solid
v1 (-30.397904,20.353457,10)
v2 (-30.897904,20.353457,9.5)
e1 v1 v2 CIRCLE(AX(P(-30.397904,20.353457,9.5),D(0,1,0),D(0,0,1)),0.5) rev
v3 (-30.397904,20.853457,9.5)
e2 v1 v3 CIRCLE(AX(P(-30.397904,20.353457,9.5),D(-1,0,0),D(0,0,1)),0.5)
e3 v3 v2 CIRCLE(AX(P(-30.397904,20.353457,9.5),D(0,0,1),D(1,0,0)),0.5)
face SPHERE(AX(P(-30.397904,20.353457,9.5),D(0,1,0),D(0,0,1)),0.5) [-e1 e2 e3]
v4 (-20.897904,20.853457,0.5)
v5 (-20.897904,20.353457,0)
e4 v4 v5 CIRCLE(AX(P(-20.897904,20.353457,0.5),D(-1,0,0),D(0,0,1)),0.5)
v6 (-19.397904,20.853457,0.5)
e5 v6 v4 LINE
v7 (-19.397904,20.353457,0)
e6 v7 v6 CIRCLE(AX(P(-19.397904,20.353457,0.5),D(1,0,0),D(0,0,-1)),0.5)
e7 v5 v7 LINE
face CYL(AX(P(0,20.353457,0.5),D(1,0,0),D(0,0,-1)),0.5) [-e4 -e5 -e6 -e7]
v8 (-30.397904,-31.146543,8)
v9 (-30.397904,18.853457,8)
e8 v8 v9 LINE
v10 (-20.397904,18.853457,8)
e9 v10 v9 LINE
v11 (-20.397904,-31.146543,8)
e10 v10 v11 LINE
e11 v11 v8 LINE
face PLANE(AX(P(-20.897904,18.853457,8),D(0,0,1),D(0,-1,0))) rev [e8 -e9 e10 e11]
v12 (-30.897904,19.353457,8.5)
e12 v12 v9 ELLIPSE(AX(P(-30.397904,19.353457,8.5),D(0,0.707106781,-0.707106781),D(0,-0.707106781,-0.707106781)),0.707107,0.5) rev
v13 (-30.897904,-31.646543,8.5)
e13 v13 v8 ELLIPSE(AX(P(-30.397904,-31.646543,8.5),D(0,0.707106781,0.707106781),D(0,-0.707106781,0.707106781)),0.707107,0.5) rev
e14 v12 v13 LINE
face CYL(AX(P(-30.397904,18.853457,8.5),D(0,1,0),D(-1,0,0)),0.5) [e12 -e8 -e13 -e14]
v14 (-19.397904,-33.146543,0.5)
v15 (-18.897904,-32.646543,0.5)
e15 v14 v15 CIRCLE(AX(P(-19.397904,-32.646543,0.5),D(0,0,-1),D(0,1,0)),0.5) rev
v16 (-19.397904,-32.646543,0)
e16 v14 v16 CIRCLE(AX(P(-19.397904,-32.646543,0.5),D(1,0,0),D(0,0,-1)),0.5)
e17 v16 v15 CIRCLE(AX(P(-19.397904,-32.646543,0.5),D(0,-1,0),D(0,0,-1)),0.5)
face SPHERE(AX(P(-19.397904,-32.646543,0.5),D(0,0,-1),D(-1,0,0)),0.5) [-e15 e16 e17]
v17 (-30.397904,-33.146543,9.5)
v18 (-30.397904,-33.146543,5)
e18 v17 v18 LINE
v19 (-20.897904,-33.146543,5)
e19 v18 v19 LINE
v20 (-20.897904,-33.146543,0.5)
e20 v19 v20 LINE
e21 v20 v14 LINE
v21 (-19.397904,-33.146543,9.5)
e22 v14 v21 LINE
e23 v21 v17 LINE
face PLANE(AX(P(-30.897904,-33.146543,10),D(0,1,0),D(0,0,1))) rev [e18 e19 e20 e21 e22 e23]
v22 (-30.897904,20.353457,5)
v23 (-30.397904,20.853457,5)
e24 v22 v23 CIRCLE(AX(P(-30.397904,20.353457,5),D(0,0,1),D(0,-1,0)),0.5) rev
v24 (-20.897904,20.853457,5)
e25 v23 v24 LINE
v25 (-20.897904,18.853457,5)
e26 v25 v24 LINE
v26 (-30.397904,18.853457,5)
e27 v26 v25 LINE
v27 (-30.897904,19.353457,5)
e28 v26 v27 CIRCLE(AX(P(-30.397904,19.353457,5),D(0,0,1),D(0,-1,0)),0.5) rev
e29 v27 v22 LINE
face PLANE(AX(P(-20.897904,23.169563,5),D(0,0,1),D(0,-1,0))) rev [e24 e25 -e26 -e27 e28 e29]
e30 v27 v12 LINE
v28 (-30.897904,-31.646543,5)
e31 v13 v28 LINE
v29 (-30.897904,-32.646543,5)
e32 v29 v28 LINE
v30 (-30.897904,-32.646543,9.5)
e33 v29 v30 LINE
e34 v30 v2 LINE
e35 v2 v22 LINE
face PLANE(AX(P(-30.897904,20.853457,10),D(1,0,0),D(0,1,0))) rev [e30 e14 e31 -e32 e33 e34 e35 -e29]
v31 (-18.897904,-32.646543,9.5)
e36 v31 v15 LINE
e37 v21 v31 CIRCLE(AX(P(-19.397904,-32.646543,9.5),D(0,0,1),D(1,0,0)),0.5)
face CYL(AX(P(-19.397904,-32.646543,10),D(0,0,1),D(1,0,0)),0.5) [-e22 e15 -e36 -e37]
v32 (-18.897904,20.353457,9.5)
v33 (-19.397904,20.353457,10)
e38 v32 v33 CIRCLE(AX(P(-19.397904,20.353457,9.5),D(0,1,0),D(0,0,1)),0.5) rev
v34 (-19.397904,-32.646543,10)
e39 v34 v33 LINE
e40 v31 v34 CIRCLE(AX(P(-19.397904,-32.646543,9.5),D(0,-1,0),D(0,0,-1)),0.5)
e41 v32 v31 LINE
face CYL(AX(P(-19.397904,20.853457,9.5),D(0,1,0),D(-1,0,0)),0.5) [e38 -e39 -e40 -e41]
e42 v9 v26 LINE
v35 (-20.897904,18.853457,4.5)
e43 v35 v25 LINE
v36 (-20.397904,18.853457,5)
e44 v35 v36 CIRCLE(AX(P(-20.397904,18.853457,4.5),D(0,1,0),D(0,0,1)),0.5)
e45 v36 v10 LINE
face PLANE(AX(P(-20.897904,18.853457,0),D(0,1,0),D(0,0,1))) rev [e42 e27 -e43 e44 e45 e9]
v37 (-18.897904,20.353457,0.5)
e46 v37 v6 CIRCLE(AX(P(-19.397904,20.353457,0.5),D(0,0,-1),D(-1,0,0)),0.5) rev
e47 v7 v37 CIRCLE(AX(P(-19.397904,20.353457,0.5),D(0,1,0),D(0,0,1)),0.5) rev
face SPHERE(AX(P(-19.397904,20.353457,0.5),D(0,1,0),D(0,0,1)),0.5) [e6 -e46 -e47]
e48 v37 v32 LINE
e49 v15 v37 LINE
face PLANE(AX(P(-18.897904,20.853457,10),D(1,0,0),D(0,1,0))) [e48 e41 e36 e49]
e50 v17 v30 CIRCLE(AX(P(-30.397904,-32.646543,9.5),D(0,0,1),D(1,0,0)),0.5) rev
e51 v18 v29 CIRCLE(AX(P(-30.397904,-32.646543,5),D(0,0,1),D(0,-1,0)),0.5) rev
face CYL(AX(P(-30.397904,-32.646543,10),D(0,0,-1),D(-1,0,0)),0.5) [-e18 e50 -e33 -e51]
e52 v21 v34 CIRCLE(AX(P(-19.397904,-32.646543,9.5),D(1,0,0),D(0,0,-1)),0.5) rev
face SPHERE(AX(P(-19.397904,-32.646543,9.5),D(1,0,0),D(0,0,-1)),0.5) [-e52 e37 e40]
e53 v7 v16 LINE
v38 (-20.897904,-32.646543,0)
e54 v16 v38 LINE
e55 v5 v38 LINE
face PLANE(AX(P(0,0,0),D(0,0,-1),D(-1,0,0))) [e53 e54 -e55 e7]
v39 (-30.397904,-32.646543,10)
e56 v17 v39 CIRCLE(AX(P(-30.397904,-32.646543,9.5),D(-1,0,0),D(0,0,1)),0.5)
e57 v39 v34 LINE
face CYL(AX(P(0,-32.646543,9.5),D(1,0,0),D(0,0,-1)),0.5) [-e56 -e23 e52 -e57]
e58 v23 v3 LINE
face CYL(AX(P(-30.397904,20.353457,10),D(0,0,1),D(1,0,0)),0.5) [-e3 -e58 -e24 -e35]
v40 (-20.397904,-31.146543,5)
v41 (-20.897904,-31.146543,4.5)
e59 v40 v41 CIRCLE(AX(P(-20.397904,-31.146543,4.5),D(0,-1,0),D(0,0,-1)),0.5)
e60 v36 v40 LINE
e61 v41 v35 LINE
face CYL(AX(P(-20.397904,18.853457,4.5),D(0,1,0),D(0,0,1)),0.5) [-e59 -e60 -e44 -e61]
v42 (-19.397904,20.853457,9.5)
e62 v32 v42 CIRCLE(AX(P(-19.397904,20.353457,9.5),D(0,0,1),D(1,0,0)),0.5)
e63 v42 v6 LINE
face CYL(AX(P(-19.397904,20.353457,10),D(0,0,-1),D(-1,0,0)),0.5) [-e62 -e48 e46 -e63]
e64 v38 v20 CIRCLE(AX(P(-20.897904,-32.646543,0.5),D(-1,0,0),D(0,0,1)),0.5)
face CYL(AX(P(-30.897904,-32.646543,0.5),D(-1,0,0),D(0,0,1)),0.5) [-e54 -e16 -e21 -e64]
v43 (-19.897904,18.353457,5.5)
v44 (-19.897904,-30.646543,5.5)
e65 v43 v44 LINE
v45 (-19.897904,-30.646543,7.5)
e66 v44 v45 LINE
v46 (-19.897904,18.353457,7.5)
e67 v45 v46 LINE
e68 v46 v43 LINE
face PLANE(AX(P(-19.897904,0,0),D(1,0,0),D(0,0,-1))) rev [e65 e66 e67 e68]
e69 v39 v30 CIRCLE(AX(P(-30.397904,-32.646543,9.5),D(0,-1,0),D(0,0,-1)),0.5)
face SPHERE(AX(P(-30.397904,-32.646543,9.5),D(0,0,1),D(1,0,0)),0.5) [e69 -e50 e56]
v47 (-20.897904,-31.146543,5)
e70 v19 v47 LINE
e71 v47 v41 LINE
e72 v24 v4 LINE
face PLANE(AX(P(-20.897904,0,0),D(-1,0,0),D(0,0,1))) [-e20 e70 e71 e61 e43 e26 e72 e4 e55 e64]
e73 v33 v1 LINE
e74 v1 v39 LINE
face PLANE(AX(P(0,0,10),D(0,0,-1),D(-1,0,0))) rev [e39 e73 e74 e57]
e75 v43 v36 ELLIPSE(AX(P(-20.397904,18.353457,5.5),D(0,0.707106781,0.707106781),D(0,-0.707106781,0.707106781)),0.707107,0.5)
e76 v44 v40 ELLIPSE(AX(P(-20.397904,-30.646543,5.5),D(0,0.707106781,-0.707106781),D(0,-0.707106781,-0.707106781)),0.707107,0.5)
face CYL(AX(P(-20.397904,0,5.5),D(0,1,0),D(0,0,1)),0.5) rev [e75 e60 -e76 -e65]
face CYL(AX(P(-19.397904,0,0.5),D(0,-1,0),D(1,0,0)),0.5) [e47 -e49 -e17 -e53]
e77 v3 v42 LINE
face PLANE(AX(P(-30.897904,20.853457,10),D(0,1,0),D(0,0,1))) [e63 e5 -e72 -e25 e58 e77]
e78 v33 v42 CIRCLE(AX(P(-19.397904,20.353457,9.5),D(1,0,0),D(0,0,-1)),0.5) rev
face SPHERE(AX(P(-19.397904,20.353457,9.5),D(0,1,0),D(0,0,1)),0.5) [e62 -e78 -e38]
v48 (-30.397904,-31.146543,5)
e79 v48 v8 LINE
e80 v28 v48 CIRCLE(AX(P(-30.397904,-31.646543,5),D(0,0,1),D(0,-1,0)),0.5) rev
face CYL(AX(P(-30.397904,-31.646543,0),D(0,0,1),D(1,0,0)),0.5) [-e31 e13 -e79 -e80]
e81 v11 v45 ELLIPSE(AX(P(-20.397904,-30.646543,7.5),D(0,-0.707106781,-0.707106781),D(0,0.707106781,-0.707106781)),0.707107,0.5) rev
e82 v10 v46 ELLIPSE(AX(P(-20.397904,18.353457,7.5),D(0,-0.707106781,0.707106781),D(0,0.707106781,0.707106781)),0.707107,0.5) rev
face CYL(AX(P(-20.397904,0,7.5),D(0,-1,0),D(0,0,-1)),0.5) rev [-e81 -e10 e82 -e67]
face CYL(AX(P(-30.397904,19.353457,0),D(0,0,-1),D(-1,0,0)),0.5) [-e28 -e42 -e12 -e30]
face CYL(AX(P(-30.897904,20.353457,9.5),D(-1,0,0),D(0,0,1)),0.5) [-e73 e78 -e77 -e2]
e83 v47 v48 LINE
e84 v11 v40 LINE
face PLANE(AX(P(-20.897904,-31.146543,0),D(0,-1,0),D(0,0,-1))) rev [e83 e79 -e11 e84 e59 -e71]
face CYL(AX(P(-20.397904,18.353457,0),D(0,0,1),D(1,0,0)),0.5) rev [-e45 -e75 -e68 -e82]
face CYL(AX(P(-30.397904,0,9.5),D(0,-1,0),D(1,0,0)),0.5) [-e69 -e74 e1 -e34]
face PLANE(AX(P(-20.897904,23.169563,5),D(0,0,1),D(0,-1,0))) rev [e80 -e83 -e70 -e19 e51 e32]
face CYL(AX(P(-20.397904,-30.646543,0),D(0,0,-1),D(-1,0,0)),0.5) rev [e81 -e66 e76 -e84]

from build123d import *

# Parameters (mm, degrees)
SKETCH_1_W          = 12
SKETCH_1_H          = 54
EXTRUDE_1_DEPTH     = 10
SKETCH_2_W          = 8
SKETCH_2_H          = 50
CUT_EXTRUDE_1_DEPTH = 10
SKETCH_3_W          = 13.565938191
SKETCH_3_H          = 57.788760324
CUT_EXTRUDE_2_DEPTH = 10
SKETCH_4_W          = 3
SKETCH_4_H          = 50
CUT_EXTRUDE_3_DEPTH = 1
FILLET_1_R          = 0.5


with BuildPart() as part:
    # 草圖1 → 填料-伸長1 (new body)
    with BuildSketch(Plane.XY):
        with Locations((-24.897904343, -6.146542517)):
            Rectangle(SKETCH_1_W, SKETCH_1_H)
    extrude(amount=EXTRUDE_1_DEPTH)

    # 草圖2 → 除料-伸長1 (cut)
    with BuildSketch(Plane.ZY.offset(30.897904343)):
        with Locations((4, -6.146542517)):
            Rectangle(SKETCH_2_W, SKETCH_2_H)
    extrude(amount=-CUT_EXTRUDE_1_DEPTH, mode=Mode.SUBTRACT)

    # 草圖3 → 除料-伸長2 (cut)
    with BuildSketch(Plane.ZY.offset(30.897904343)):
        with Locations((-1.782969096, -5.724817648)):
            Rectangle(SKETCH_3_W, SKETCH_3_H)
    extrude(amount=-CUT_EXTRUDE_2_DEPTH, mode=Mode.SUBTRACT)

    # 草圖4 → 除料-伸長3 (cut)
    with BuildSketch(Plane.ZY.offset(20.897904343)):
        with Locations((6.5, -6.146542517)):
            Rectangle(SKETCH_4_W, SKETCH_4_H)
    extrude(amount=-CUT_EXTRUDE_3_DEPTH, mode=Mode.SUBTRACT)

    # 圓角1
    fillet_1_edges = [part.edges().sort_by_distance(p)[0] for p in [
        (-24.897904343, 20.853457483, 10),
        (-30.897904343, -6.146542517, 10),
        (-30.897904343, -6.146542517, 8),
        (-30.897904343, 18.853457483, 6.5),
        (-30.897904343, -31.146542517, 6.5),
        (-19.897904343, 20.853457483, 0),
        (-19.897904343, -33.146542517, 0),
        (-24.897904343, -33.146542517, 10),
        (-18.897904343, -6.146542517, 0),
        (-19.897904343, -6.146542517, 8),
        (-19.897904343, -31.146542517, 6.5),
        (-19.897904343, -6.146542517, 5),
        (-19.897904343, 18.853457483, 6.5),
        (-20.897904343, -6.146542517, 5),
        (-30.897904343, -33.146542517, 7.5),
        (-30.897904343, 20.853457483, 7.5),
        (-18.897904343, 20.853457483, 5),
        (-18.897904343, -33.146542517, 5),
        (-18.897904343, -6.146542517, 10),
    ]]
    fillet(fillet_1_edges, radius=FILLET_1_R - 0.0001)  # a hair under: the kernel refuses the full size


solid = part.part
